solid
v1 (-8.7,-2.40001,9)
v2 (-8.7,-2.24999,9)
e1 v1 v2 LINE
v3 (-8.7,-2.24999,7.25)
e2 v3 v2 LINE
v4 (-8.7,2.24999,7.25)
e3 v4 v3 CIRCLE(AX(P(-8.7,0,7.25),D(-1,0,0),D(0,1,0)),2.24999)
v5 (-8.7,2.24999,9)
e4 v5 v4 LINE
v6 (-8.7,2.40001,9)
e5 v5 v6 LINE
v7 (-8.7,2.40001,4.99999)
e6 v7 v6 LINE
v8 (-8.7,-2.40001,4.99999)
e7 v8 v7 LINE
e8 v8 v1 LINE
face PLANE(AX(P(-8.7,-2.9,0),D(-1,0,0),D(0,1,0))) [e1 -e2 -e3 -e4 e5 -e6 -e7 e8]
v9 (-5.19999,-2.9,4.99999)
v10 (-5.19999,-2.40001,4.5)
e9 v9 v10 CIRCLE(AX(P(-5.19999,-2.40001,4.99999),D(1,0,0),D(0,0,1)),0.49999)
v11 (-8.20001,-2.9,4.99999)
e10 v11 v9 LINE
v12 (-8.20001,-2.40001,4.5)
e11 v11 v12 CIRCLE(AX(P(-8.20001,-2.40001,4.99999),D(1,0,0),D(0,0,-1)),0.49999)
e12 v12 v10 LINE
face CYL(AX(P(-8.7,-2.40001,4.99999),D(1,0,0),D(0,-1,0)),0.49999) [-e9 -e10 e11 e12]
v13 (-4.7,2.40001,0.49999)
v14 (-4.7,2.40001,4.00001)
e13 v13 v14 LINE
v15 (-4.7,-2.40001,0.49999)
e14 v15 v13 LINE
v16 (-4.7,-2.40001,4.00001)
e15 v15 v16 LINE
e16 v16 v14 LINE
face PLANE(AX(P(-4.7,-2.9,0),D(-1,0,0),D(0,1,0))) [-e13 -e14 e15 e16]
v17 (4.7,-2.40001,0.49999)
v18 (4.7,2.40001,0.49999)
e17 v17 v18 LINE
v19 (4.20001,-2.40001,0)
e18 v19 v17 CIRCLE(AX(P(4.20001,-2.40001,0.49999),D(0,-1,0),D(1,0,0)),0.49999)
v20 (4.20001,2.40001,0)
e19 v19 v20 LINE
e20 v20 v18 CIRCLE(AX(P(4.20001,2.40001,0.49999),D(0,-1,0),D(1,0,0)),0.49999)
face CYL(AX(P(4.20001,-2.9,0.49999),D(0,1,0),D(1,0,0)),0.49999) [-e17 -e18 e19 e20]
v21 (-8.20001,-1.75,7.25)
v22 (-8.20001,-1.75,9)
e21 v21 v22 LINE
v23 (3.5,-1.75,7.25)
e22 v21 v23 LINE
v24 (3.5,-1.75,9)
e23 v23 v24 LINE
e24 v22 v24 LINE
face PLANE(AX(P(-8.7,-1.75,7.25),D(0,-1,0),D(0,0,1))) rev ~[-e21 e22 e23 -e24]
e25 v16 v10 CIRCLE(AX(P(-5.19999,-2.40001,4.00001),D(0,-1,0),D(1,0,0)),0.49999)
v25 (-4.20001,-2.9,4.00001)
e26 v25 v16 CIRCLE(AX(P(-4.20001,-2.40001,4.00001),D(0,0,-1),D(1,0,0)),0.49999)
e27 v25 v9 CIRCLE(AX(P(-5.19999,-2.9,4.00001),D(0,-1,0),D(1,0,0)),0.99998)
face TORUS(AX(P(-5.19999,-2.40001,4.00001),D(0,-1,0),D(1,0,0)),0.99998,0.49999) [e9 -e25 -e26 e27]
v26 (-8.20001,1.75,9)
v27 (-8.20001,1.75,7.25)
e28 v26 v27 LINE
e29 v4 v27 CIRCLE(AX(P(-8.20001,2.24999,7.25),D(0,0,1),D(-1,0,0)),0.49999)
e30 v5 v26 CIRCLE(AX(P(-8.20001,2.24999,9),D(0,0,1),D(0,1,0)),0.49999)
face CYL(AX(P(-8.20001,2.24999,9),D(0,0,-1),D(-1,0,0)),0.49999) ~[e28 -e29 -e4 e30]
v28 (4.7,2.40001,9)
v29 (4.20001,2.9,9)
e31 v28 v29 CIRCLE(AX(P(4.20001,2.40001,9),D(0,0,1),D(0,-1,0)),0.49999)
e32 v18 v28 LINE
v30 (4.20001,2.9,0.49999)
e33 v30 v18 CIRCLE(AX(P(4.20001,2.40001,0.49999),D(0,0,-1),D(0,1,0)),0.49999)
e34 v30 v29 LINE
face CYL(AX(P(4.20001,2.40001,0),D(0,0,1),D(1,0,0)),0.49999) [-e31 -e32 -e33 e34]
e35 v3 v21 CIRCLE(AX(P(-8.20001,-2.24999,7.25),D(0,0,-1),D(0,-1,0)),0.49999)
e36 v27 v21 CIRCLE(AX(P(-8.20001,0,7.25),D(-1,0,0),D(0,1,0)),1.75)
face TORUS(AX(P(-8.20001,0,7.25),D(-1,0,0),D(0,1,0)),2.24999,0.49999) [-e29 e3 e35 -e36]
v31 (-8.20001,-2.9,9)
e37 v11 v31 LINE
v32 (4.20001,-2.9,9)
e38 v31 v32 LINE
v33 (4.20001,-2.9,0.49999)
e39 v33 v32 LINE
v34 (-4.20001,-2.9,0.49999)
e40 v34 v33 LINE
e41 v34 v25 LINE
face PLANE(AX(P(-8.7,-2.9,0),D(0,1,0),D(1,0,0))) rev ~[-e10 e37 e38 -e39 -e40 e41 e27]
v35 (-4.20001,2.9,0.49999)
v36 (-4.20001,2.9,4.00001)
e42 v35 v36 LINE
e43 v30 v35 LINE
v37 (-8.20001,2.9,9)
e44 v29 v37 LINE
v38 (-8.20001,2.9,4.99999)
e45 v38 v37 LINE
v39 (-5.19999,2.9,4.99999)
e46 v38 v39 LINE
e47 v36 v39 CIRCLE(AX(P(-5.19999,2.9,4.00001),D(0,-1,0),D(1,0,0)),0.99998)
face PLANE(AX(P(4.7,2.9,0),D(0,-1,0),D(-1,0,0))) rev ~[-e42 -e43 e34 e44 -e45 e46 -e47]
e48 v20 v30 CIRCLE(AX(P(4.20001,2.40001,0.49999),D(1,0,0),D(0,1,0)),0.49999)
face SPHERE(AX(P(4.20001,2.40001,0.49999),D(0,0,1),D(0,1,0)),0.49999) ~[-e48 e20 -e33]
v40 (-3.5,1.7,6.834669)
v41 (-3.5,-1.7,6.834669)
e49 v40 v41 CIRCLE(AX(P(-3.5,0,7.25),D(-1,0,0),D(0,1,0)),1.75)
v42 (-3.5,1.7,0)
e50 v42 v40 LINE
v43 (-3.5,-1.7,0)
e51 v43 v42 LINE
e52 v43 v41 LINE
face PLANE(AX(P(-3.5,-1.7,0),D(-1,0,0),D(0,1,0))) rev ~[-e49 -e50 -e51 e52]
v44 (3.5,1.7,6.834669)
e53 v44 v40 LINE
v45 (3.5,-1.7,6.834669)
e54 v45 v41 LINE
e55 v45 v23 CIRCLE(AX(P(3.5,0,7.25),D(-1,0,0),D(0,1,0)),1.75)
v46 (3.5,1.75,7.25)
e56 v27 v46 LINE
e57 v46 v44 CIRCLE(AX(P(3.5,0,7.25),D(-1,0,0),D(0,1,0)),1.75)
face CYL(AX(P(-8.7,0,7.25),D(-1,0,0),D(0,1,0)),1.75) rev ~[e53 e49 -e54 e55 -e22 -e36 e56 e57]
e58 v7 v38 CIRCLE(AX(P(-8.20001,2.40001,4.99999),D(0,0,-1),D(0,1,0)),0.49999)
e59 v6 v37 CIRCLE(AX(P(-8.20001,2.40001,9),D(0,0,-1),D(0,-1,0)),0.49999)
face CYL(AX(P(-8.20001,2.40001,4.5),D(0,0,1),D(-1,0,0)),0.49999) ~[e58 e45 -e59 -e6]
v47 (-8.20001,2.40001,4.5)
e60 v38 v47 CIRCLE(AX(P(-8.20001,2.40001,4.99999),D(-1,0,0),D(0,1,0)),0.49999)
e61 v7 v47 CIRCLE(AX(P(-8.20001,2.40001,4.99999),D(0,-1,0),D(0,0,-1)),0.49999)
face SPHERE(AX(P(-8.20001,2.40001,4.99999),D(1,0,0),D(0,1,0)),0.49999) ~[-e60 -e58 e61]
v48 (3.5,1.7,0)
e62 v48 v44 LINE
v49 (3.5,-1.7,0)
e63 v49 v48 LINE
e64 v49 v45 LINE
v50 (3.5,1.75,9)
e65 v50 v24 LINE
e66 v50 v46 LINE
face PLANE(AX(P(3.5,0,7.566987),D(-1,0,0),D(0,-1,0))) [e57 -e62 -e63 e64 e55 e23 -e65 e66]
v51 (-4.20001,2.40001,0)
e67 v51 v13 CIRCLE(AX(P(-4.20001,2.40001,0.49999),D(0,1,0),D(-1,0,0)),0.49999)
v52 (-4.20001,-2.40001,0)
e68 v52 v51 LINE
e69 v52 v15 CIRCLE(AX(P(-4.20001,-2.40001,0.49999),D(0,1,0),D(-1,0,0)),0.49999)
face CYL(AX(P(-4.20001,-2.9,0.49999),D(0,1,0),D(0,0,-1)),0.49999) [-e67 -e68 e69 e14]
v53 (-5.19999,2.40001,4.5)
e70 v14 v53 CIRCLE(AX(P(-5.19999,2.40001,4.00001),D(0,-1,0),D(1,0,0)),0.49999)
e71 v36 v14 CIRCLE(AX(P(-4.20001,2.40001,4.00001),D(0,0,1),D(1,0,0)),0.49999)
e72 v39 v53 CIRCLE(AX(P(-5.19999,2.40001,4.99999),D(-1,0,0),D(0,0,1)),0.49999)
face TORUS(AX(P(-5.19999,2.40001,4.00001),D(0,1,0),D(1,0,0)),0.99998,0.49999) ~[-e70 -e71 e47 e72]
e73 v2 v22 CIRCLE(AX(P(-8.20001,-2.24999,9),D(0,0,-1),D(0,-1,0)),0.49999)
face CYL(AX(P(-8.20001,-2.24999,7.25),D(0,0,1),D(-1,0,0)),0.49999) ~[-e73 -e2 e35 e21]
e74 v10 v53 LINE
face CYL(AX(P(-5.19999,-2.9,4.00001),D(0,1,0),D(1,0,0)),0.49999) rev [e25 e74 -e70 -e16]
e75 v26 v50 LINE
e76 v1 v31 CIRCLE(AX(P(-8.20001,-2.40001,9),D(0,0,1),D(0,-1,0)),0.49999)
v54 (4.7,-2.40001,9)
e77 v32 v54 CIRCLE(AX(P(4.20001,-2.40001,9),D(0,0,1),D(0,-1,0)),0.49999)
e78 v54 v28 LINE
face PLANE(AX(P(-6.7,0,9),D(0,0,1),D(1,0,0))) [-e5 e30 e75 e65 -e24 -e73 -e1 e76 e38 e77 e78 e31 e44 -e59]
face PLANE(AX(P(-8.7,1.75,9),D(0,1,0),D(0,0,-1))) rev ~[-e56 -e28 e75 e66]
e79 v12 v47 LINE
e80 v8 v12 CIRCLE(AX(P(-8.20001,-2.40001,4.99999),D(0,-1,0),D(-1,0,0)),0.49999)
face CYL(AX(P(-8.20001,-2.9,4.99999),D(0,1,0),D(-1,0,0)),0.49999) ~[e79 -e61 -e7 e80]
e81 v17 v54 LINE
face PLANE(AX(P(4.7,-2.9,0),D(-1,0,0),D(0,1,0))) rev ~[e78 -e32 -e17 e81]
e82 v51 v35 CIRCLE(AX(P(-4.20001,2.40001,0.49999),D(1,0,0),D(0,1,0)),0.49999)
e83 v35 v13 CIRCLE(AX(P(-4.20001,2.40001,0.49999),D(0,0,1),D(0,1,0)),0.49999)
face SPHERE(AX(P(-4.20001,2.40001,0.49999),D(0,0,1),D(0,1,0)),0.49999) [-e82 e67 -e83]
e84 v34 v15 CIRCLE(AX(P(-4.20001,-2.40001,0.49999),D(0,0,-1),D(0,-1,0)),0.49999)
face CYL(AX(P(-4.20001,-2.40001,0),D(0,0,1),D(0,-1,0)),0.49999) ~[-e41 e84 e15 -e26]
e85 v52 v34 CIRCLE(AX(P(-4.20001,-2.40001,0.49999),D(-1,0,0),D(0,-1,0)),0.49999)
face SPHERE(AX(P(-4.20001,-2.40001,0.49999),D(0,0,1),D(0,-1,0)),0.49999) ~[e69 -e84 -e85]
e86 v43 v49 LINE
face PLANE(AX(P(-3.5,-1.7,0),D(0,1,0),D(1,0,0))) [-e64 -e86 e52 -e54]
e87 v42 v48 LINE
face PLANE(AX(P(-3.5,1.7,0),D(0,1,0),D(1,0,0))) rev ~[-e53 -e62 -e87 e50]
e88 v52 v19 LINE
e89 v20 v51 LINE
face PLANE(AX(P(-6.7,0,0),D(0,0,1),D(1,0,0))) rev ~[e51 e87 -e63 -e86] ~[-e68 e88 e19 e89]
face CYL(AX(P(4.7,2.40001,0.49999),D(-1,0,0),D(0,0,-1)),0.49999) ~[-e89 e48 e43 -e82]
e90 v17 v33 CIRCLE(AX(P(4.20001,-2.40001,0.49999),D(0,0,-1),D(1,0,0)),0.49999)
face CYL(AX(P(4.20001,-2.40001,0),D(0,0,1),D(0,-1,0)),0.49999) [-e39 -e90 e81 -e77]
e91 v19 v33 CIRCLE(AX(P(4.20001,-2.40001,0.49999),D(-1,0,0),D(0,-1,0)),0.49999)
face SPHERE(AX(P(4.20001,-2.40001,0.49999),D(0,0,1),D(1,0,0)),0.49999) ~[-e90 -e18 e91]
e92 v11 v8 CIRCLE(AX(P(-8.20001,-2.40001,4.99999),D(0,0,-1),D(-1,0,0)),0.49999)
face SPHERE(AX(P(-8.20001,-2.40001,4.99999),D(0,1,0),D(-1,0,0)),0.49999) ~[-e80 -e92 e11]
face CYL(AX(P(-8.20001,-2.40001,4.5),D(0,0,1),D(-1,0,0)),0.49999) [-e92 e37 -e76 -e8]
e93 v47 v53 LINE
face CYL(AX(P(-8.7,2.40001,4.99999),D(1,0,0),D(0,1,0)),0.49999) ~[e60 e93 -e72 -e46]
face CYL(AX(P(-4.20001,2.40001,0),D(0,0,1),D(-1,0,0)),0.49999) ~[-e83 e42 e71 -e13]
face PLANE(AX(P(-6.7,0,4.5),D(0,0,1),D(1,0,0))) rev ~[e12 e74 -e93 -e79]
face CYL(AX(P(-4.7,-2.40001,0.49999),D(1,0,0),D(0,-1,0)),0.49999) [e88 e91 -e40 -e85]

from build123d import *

# Parameters (mm, degrees)
F0_W     = 4
F0_H     = 5.8
F0_W_2   = 9.4
F0_W_3   = 7
F0_H_2   = 3.4
F1_DEPTH = 9
F2_DEPTH = 4.5
F4_DEPTH = 12.2
F5_R     = 0.49999


# Not quite as in the source:
# - a fillet or chamfer is up to 0.001 mm smaller than in the source, because OpenCascade refuses the exact size


with BuildPart() as f1:
    # F0 (on Top) → F1 (new body)
    with BuildSketch(Plane.XY):
        with Locations((-6.7, 0)):
            Rectangle(F0_W, F0_H)
        Rectangle(F0_W_2, F0_H)
        Rectangle(F0_W_3, F0_H_2, mode=Mode.SUBTRACT)
    extrude(amount=F1_DEPTH)

    # F0 (on Top) → F2 (cut)
    with BuildSketch(Plane.XY):
        with Locations((-6.7, 0)):
            Rectangle(F0_W, F0_H)
    extrude(amount=F2_DEPTH, mode=Mode.SUBTRACT)

    # F3 (on face) → F4 (cut, through all)
    with BuildSketch(Plane(origin=(-8.7, 0, 0), x_dir=(0, -1, 0), z_dir=(-1, 0, 0))):
        with BuildLine():
            Line((-1.75, 9), (-1.75, 7.25))
            ThreePointArc((-1.75, 7.25), (0, 5.5), (1.75, 7.25))
            Line((1.75, 7.25), (1.75, 9))
            Line((1.75, 9), (-1.75, 9))
        make_face()
    extrude(amount=-F4_DEPTH, mode=Mode.SUBTRACT)

    # F5 (radius 0.5 in the source; OpenCascade refuses exactly that, so slightly less here)
    f5_edges = [f1.edges().sort_by_distance(p)[0] for p in [
        (-4.7, 2.9, 2.25),
        (-6.7, 2.9, 4.5),
        (-4.7, 0, 4.5),
        (-4.7, -2.9, 2.25),
        (4.7, -2.9, 4.5),
        (4.7, 2.9, 4.5),
        (0, 2.9, 0),
        (4.7, 0, 0),
        (0, -2.9, 0),
        (-4.7, 0, 0),
        (-8.7, 2.9, 6.75),
        (-8.7, 0, 4.5),
        (-8.7, -2.9, 6.75),
        (-8.7, 0, 5.5),
        (-8.7, -1.75, 8.125),
        (-8.7, 1.75, 8.125),
        (-6.7, -2.9, 4.5),
    ]]
    fillet(f5_edges, radius=F5_R)


solid = f1.part
